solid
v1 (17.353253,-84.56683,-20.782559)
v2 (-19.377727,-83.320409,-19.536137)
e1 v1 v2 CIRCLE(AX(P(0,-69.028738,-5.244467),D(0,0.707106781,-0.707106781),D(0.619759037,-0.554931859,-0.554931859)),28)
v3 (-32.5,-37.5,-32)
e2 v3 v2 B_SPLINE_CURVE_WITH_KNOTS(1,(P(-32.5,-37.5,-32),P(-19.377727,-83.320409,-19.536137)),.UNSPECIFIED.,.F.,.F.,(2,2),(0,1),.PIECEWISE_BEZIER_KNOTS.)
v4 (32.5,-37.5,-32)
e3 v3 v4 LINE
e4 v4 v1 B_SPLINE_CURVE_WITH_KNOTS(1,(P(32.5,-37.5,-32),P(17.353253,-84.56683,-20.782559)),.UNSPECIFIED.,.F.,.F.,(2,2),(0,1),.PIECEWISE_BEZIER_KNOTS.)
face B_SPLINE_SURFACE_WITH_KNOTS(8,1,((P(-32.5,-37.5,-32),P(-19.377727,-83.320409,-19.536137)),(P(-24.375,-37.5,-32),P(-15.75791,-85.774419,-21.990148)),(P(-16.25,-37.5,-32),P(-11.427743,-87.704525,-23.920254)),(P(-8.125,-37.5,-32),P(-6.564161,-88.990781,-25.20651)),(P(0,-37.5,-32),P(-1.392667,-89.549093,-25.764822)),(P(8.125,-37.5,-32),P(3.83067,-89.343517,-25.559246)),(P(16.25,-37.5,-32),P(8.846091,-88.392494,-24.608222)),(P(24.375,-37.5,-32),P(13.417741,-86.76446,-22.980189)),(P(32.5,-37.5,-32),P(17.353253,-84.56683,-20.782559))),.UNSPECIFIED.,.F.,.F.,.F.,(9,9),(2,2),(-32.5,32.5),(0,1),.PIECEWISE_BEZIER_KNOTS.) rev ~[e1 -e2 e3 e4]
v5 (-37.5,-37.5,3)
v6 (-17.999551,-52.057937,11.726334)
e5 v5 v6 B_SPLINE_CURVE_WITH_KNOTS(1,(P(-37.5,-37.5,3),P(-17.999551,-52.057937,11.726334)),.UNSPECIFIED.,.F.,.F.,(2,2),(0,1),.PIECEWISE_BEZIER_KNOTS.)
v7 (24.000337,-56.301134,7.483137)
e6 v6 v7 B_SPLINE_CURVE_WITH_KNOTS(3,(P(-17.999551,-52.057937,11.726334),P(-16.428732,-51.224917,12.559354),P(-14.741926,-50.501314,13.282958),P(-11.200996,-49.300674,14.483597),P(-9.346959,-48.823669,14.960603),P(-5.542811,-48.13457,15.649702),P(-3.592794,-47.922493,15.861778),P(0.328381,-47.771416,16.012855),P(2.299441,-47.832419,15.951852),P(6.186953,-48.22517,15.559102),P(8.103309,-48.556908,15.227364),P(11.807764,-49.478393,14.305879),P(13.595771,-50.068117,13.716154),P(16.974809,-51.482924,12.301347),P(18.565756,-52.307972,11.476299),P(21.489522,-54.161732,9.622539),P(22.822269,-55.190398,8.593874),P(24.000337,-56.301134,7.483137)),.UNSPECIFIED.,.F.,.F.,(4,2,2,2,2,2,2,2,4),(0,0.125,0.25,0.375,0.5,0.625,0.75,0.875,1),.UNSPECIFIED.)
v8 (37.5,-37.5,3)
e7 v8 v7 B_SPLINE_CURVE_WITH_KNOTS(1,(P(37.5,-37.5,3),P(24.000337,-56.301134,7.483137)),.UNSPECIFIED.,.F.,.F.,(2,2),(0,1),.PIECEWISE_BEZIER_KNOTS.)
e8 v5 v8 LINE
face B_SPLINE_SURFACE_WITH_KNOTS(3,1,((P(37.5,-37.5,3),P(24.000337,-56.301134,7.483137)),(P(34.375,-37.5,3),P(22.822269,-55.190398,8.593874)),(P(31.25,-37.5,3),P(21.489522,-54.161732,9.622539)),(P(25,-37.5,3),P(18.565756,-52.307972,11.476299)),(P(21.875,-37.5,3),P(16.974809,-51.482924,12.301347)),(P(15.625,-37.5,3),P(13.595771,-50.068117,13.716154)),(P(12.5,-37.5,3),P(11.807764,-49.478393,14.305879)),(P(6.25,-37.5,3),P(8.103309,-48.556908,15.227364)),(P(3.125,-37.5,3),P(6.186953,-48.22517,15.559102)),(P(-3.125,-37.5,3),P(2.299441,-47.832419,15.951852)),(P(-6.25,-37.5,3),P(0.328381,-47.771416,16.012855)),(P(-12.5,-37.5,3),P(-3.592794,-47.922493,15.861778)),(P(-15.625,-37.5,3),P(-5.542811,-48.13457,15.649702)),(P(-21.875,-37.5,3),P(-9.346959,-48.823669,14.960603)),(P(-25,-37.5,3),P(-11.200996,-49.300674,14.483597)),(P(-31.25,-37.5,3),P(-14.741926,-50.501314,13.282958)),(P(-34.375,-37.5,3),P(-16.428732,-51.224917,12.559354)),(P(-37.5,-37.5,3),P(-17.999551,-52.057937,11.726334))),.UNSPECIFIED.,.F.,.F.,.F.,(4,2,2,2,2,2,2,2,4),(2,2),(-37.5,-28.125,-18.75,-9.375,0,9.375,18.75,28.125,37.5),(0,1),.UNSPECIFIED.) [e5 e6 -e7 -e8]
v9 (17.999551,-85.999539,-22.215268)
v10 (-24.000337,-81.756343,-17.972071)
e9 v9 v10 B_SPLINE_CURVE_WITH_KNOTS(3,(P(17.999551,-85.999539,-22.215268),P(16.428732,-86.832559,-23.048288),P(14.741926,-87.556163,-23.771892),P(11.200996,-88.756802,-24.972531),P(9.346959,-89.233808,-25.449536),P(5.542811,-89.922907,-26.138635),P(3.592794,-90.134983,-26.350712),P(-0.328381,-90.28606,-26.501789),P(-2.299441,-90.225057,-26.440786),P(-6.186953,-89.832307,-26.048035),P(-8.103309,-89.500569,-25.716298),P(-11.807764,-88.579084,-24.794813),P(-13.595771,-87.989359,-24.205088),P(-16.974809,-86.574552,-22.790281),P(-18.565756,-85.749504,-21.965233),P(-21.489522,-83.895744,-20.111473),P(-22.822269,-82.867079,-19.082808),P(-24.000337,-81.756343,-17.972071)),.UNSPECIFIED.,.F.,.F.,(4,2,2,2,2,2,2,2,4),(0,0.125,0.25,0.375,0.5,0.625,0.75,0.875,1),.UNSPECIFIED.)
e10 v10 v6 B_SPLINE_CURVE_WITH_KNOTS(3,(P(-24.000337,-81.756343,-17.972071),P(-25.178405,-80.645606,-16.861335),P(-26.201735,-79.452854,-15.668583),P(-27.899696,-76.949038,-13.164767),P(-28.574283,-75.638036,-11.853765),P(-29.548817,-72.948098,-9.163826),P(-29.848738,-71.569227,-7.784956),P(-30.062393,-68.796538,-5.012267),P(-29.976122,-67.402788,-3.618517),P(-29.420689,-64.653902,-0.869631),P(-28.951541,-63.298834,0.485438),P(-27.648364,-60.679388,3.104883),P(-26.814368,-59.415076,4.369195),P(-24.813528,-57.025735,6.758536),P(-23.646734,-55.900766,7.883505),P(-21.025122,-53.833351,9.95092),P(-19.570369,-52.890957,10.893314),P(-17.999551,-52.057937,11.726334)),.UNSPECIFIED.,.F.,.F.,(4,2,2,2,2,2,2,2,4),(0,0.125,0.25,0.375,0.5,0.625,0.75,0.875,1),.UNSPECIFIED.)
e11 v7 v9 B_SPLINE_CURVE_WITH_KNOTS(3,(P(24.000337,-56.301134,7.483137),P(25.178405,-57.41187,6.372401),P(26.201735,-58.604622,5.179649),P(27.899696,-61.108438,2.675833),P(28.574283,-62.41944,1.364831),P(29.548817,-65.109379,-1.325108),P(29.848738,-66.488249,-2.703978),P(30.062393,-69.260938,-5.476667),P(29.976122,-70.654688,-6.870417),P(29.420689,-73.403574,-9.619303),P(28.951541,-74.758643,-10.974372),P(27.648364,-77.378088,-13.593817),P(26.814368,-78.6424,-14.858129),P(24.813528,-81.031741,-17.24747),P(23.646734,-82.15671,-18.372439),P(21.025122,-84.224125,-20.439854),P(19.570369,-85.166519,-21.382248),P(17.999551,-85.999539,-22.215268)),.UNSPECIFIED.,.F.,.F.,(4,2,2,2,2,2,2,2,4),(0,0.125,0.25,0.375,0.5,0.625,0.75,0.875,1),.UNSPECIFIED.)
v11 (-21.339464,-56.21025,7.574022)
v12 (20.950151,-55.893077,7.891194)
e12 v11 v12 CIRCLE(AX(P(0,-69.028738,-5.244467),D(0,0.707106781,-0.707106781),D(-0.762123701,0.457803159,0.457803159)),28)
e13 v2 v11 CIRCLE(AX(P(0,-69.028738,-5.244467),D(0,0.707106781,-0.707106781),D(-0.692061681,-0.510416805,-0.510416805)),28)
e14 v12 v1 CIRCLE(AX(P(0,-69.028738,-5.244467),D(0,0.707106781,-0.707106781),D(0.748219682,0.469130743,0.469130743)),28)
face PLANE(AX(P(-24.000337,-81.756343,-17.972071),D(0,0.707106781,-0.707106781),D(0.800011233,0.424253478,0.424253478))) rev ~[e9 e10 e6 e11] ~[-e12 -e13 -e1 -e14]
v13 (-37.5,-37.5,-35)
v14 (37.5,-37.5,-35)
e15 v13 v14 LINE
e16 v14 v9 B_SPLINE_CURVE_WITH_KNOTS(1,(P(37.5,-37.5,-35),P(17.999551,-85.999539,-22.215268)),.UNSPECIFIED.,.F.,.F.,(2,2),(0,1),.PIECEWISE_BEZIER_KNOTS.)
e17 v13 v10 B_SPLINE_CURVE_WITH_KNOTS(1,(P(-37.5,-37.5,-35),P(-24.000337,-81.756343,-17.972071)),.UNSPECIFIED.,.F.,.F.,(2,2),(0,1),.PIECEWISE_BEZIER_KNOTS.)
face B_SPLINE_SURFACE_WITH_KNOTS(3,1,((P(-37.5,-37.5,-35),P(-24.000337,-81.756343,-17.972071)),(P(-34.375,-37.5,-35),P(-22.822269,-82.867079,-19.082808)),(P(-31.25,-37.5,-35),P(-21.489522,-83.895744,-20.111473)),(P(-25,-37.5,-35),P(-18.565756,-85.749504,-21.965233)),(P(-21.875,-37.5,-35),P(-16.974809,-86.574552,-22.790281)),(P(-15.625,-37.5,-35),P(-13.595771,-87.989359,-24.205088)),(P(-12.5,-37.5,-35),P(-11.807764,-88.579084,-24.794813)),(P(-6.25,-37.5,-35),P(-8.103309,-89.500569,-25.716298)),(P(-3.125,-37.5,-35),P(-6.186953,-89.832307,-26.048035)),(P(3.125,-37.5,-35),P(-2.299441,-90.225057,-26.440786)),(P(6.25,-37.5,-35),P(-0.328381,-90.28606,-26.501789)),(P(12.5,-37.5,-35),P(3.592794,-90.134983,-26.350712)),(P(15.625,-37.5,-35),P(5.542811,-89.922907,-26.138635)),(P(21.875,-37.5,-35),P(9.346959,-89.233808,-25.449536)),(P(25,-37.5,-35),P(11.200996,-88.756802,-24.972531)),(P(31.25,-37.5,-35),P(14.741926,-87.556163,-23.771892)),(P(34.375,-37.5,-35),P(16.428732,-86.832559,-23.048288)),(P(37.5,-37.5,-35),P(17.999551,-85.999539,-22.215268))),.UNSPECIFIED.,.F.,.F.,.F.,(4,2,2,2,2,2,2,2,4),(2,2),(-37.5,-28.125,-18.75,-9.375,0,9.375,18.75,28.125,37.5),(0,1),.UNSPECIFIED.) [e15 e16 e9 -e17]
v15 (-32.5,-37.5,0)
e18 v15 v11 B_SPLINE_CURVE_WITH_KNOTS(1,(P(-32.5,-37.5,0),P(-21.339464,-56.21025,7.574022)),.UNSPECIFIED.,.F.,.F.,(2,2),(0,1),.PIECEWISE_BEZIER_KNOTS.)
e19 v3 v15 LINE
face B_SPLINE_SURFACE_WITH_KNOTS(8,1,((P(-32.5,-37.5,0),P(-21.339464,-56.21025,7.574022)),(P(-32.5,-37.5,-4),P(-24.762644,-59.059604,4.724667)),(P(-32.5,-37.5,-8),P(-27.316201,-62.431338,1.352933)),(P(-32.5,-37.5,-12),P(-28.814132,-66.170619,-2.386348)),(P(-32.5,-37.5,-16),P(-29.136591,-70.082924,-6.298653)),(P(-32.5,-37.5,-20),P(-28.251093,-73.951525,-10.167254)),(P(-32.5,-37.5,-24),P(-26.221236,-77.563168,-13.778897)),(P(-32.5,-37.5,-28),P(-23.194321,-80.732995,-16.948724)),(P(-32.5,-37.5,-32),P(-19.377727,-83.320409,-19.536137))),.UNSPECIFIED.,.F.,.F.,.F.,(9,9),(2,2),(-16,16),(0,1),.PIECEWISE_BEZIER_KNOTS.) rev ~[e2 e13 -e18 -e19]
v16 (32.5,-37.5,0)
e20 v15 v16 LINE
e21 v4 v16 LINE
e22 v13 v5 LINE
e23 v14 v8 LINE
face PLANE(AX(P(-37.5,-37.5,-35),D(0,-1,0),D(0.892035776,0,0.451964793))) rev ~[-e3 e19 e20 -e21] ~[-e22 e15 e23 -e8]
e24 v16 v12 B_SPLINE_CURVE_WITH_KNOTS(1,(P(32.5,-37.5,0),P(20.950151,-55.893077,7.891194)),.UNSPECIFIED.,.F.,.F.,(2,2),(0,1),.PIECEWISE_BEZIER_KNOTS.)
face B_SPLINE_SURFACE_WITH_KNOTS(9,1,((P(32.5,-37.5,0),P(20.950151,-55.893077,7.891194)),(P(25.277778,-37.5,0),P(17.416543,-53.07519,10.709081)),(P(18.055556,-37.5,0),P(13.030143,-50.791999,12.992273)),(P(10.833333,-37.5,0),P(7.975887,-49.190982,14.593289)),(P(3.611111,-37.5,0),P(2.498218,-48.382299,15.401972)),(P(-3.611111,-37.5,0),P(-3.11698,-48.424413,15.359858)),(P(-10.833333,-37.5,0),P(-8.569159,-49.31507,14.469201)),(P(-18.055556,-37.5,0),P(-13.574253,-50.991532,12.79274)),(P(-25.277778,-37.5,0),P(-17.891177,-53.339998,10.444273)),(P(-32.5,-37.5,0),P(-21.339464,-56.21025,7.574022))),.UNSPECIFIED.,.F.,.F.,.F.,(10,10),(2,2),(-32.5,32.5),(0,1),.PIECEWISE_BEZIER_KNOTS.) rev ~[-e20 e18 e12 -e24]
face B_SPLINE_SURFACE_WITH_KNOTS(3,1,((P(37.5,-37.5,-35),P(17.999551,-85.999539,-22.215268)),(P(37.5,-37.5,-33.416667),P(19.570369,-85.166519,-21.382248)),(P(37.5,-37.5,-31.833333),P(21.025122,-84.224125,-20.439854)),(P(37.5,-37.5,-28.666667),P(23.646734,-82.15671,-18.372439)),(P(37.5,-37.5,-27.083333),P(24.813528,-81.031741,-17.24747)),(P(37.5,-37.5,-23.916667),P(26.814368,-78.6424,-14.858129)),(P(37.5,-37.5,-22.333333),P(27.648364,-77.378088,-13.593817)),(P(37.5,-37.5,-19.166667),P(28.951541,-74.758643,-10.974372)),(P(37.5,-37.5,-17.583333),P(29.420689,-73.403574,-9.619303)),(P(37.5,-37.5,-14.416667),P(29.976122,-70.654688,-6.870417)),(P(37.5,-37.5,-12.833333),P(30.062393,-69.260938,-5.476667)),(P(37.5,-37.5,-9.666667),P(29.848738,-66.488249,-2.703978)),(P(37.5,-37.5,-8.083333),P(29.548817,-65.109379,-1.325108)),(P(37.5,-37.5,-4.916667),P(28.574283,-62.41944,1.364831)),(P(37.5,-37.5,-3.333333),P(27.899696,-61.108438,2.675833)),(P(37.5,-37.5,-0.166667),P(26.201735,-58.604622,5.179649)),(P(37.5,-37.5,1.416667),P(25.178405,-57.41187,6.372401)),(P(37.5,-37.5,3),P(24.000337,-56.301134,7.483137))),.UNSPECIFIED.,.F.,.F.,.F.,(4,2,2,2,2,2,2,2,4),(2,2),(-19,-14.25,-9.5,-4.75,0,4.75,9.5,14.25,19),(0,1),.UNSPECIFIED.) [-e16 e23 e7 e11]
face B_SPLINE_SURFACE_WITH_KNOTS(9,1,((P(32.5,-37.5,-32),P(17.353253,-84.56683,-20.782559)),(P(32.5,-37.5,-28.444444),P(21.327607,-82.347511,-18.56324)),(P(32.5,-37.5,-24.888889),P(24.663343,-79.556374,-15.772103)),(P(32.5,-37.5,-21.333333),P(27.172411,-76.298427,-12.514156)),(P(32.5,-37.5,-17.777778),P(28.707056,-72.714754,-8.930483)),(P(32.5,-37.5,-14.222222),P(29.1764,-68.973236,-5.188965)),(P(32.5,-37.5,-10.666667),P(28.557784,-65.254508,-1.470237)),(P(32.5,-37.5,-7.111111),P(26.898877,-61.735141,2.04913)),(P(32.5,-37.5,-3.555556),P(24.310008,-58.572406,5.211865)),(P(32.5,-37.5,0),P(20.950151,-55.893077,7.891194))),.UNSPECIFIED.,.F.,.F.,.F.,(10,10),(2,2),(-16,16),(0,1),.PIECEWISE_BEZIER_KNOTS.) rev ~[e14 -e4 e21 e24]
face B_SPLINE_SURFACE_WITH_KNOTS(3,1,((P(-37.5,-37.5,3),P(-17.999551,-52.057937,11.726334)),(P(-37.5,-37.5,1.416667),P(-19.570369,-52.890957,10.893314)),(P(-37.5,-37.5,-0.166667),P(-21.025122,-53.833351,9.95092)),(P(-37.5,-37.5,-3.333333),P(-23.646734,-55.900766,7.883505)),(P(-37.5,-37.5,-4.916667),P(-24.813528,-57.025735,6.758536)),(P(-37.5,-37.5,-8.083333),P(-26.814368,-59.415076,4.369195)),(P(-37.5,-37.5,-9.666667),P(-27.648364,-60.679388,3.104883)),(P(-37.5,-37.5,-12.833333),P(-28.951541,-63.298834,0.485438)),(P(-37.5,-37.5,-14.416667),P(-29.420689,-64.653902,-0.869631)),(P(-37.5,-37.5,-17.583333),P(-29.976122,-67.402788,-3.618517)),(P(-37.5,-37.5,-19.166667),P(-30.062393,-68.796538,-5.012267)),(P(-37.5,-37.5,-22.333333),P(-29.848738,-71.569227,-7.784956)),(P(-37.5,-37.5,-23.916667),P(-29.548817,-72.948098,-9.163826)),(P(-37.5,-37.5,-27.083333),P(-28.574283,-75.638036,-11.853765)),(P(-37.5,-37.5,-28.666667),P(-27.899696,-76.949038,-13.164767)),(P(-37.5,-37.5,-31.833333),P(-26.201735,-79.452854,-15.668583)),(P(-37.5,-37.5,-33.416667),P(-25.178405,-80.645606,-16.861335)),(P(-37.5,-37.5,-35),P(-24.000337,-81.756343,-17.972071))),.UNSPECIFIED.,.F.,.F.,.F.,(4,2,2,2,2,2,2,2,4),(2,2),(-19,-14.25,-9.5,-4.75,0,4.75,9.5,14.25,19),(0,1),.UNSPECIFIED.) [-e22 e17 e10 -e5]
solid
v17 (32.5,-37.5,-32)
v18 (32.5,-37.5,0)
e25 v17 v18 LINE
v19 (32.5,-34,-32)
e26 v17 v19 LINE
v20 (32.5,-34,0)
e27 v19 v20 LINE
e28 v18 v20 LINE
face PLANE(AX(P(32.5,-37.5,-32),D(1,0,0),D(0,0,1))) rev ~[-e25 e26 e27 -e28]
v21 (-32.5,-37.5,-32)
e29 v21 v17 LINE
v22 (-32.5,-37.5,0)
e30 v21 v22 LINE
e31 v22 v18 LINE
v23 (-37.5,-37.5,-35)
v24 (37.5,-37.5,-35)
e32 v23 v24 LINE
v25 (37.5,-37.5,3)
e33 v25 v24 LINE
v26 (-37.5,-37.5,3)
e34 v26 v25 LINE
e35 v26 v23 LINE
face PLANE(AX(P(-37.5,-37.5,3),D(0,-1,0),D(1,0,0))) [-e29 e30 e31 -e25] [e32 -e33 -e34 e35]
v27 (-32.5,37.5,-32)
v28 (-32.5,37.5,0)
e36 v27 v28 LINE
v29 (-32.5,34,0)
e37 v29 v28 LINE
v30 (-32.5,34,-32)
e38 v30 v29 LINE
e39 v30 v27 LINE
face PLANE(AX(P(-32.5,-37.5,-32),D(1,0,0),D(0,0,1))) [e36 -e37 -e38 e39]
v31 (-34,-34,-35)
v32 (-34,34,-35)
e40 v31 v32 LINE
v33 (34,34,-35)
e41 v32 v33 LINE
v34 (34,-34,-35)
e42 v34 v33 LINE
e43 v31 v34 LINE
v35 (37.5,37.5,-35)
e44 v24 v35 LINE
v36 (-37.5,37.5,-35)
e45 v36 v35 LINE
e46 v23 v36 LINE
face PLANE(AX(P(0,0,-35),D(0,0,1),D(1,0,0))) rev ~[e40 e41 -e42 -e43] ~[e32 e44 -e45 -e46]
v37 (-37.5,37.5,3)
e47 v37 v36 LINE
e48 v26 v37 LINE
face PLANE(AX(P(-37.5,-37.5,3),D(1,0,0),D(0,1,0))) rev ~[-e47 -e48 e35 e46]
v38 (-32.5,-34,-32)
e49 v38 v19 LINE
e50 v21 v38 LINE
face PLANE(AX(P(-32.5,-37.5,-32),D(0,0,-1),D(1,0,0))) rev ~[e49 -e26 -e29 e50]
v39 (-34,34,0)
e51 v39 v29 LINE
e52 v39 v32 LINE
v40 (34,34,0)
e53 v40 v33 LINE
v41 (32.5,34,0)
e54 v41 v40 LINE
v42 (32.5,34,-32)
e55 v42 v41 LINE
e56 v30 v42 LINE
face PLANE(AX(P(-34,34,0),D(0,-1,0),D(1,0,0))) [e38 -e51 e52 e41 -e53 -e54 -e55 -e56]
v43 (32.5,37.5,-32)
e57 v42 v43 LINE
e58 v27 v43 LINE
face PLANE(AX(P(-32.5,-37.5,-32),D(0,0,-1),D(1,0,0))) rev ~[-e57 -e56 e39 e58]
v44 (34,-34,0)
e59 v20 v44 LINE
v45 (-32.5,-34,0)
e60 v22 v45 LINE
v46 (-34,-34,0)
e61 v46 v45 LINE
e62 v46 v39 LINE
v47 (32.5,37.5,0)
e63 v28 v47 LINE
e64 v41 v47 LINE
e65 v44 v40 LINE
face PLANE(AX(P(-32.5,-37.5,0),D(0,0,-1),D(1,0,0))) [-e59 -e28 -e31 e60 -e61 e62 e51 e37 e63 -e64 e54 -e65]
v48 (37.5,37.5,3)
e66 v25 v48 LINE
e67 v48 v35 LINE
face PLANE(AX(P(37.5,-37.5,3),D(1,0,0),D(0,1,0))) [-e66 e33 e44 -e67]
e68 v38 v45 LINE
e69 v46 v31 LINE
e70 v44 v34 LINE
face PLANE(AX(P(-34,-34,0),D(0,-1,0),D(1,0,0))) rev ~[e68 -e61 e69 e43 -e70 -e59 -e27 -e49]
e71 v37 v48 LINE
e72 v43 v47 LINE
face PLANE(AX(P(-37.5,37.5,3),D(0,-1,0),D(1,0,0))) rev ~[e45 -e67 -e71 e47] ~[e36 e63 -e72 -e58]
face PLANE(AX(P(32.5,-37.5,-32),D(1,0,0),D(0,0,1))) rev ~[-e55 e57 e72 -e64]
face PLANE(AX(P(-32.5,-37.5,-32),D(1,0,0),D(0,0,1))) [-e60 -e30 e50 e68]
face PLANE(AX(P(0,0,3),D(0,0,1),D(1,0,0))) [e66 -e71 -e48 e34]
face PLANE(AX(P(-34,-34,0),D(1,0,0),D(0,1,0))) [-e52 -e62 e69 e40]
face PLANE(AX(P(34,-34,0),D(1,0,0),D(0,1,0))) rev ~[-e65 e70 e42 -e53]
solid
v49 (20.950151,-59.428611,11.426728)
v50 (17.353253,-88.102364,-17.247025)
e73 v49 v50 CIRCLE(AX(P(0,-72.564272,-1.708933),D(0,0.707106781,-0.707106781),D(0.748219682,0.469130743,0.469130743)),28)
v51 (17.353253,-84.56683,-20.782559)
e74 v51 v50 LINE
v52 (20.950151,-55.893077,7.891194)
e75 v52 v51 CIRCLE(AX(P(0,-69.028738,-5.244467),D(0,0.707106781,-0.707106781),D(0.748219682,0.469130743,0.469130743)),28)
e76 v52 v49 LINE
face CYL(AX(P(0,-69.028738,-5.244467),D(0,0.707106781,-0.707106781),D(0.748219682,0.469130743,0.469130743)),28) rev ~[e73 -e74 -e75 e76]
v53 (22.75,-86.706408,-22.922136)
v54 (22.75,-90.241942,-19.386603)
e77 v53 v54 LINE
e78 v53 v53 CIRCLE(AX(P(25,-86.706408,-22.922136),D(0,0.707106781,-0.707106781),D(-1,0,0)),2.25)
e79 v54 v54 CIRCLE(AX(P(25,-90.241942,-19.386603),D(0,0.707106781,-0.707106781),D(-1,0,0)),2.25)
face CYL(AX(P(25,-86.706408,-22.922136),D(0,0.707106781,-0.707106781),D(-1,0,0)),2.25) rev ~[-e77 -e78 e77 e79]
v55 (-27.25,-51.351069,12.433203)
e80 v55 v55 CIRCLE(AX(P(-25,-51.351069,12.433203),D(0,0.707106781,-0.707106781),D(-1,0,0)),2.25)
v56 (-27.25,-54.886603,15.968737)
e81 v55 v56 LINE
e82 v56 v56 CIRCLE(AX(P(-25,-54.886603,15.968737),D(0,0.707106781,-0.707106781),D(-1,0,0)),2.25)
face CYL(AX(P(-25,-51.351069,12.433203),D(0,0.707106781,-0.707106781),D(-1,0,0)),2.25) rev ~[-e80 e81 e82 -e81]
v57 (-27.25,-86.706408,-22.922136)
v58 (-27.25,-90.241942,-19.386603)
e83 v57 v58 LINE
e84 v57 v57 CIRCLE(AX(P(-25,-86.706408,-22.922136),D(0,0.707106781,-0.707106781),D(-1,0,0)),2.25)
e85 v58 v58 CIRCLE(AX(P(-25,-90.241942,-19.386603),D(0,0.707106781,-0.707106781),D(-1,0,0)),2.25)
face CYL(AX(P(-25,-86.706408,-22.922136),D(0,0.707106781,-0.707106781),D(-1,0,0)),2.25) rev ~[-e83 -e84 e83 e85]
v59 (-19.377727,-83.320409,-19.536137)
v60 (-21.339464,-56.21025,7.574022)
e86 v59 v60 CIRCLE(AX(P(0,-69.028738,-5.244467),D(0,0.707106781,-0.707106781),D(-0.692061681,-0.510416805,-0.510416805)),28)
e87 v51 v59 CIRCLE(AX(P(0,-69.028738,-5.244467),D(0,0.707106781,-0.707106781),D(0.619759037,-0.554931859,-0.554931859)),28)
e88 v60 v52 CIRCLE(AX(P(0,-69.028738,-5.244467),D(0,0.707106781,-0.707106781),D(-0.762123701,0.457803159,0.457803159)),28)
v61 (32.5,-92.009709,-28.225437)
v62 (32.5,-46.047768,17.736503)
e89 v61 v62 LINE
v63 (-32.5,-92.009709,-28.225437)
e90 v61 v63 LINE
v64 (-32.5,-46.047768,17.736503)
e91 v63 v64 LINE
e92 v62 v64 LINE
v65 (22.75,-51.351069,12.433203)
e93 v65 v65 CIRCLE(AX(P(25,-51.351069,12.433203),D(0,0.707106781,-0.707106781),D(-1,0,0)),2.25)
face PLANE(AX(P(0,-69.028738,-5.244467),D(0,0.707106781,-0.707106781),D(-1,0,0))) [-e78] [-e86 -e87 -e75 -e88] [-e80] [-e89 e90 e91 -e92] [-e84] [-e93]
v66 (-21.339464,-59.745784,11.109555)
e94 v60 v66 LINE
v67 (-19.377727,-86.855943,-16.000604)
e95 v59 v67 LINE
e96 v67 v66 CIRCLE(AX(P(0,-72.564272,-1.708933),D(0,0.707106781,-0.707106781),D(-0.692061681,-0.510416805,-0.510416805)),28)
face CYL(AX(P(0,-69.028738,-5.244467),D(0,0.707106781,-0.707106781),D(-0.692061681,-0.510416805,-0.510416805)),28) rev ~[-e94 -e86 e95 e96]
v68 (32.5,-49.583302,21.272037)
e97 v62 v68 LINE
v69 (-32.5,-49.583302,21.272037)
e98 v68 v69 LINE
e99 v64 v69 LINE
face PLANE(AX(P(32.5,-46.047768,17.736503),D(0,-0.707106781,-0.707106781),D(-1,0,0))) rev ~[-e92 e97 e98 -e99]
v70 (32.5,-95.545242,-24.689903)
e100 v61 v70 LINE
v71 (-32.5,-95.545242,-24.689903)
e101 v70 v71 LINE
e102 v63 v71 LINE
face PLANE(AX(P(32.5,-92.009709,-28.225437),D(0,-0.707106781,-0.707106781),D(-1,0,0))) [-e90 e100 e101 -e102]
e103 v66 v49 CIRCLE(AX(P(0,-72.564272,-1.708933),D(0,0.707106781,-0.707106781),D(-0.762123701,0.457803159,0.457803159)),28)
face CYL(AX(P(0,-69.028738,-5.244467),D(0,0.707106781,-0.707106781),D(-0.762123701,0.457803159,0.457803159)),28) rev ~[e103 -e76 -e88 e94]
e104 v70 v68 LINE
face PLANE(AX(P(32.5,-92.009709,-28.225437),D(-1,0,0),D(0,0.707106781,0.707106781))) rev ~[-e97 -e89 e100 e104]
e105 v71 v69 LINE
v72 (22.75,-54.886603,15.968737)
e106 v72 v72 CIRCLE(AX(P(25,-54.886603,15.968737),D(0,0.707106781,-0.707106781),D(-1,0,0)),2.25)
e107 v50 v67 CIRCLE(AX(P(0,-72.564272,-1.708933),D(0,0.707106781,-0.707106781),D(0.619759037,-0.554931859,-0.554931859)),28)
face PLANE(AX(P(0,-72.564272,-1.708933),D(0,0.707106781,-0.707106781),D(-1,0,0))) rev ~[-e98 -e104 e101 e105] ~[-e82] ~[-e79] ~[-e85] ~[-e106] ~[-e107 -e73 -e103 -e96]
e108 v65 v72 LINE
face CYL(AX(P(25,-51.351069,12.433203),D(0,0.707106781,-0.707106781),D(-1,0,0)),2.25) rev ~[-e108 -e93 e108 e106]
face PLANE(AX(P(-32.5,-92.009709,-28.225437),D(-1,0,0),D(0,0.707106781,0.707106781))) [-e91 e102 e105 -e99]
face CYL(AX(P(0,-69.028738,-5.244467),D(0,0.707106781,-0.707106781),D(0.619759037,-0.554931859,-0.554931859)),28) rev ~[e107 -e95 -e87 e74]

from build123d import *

# Parameters (mm, degrees)
F1_W      = 75
F1_H      = 75
F2_DEPTH  = 38
F3_W      = 68
F3_H      = 68
F4_DEPTH  = 35
F6_W      = 65
F6_H      = 32
F7_DEPTH  = 75
F9_W      = 65
F9_H      = 32
F10_W     = 75
F10_H     = 38
F18_DEPTH = 5
F21_R     = 2.25
F22_DEPTH = 5
F19_W     = 65
F19_H     = 65
F23_DEPTH = 5


# Not quite as in the source:
# - a feature of the source that left no trace in its solid (it failed there, or was rolled back) is left out
# - the arcs of a loft's sections are written as splines that run evenly, so that the points pair up as in the source's solid


with BuildPart() as f2:
    # F1 (on offset) → F2 (new body)
    with BuildSketch(Plane.XY.offset(3)):
        Rectangle(F1_W, F1_H)
    extrude(amount=-F2_DEPTH)


with BuildPart() as f4:
    # F3 (on Top) → F4 (new body, through all)
    with BuildSketch(Plane.XY):
        Rectangle(F3_W, F3_H)
    extrude(amount=-F4_DEPTH)


with BuildPart() as f2_1:
    add(f2.part)

    # F5: cut F4
    add(f4.part, mode=Mode.SUBTRACT)


with BuildPart() as f7:
    # F6 (on face) → F7 (new body, through all)
    with BuildSketch(Plane.XZ.offset(37.5)):
        with Locations((0, -16)):
            Rectangle(F6_W, F6_H)
    extrude(amount=-F7_DEPTH)


with BuildPart() as f2_2:
    add(f2_1.part)

    # F8: cut F7
    add(f7.part, mode=Mode.SUBTRACT)


with BuildPart() as f15:
    # F9 (on face) → F15 section 0
    with BuildSketch(Plane.XZ.offset(37.5)):
        with Locations((0, -16)):
            Rectangle(F9_W, F9_H)
    # F14 (on offset) → F15 section 1
    with BuildSketch(Plane(origin=(0, -31.8921356237, 31.8921356237), x_dir=(-1, 0, 0), z_dir=(0, 0.7071067812, -0.7071067812))):
        with BuildLine():
            ThreePointArc((19.3777270669, -72.7305613051), (27.9634183298, -53.9499033063), (21.3394636211, -34.3910067794))
            ThreePointArc((21.3394636211, -34.3910067794), (0.2969683656, -24.5206618662), (-20.9501510919, -33.9424573448))
            ThreePointArc((-20.9501510919, -33.9424573448), (-27.8904955693, -54.9930022936), (-17.3532530257, -74.4932675145))
            ThreePointArc((-17.3532530257, -74.4932675145), (1.3421650722, -80.4869005137), (19.3777270669, -72.7305613051))
        make_face()
    loft()


with BuildPart() as f17:
    # F10 (on face) → F17 section 0
    with BuildSketch(Plane.XZ.offset(37.5)):
        with Locations((0, -16)):
            Rectangle(F10_W, F10_H)
    # F16 (on offset) → F17 section 1
    with BuildSketch(Plane(origin=(0, -31.8921356237, 31.8921356237), x_dir=(-1, 0, 0), z_dir=(0, 0.7071067812, -0.7071067812))):
        with BuildLine():
            add(Edge.make_bspline(
                [(-24.0003369849, -34.5195363186), (-25.1784048219, -36.090354701), (-26.2017352476, -37.7771609273), (-27.8996955072, -41.31809129), (-28.5742833559, -43.1721278699), (-29.5488165406, -46.9762758623), (-29.8487377794, -48.9262932099), (-30.0623931254, -52.8474675582), (-29.9761219495, -54.8185276002), (-29.4206888016, -58.7060397732), (-28.9515405638, -60.6223957777), (-27.6483639065, -64.3268508627), (-26.8143677105, -66.1148583431), (-24.8135278918, -69.4938962086), (-23.6467337438, -71.0848430403), (-21.0251219159, -74.0086091562), (-19.5703690605, -75.3413561445), (-17.9995506781, -76.5194239816)],
                knots=[0, 0, 0, 0, 0.125, 0.125, 0.25, 0.25, 0.375, 0.375, 0.5, 0.5, 0.625, 0.625, 0.75, 0.75, 0.875, 0.875, 1, 1, 1, 1], degree=3))
            add(Edge.make_bspline(
                [(-17.9995506781, -76.5194239816), (-16.4287322957, -77.6974918186), (-14.7419260694, -78.7208222443), (-11.2009957067, -80.418782504), (-9.3469591268, -81.0933703526), (-5.5428111344, -82.0679035373), (-3.5927937869, -82.3678247761), (0.3283805615, -82.5814801221), (2.2994406035, -82.4952089462), (6.1869527765, -81.9397757983), (8.103308781, -81.4706275605), (11.8077638659, -80.1674509032), (13.5957713464, -79.3334547072), (16.9748092119, -77.3326148885), (18.5657560436, -76.1658207405), (21.4895221595, -73.5442089126), (22.8222691478, -72.0894560572), (24.0003369849, -70.5186376748)],
                knots=[0, 0, 0, 0, 0.125, 0.125, 0.25, 0.25, 0.375, 0.375, 0.5, 0.5, 0.625, 0.625, 0.75, 0.75, 0.875, 0.875, 1, 1, 1, 1], degree=3))
            add(Edge.make_bspline(
                [(24.0003369849, -70.5186376748), (25.1784048219, -68.9478192924), (26.2017352476, -67.2610130661), (27.8996955072, -63.7200827034), (28.5742833559, -61.8660461235), (29.5488165406, -58.0618981311), (29.8487377794, -56.1118807836), (30.0623931254, -52.1907064353), (29.9761219495, -50.2196463932), (29.4206888016, -46.3321342203), (28.9515405638, -44.4157782157), (27.6483639065, -40.7113231308), (26.8143677105, -38.9233156503), (24.8135278918, -35.5442777848), (23.6467337438, -33.9533309531), (21.0251219159, -31.0295648372), (19.5703690605, -29.6968178489), (17.9995506781, -28.5187500119)],
                knots=[0, 0, 0, 0, 0.125, 0.125, 0.25, 0.25, 0.375, 0.375, 0.5, 0.5, 0.625, 0.625, 0.75, 0.75, 0.875, 0.875, 1, 1, 1, 1], degree=3))
            add(Edge.make_bspline(
                [(17.9995506781, -28.5187500119), (16.4287322957, -27.3406821748), (14.7419260694, -26.3173517491), (11.2009957067, -24.6193914895), (9.3469591268, -23.9448036409), (5.5428111344, -22.9702704561), (3.5927937869, -22.6703492173), (-0.3283805615, -22.4566938713), (-2.2994406035, -22.5429650472), (-6.1869527765, -23.0983981951), (-8.103308781, -23.5675464329), (-11.8077638659, -24.8707230902), (-13.5957713464, -25.7047192862), (-16.9748092119, -27.7055591049), (-18.5657560436, -28.8723532529), (-21.4895221595, -31.4939650809), (-22.8222691478, -32.9487179362), (-24.0003369849, -34.5195363186)],
                knots=[0, 0, 0, 0, 0.125, 0.125, 0.25, 0.25, 0.375, 0.375, 0.5, 0.5, 0.625, 0.625, 0.75, 0.75, 0.875, 0.875, 1, 1, 1, 1], degree=3))
        make_face()
    loft(ruled=True)

    # F25: cut F15
    add(f15.part, mode=Mode.SUBTRACT)


with BuildPart() as f18:
    # F14 (on offset) → F18 (new body)
    with BuildSketch(Plane(origin=(0, -31.8921356237, 31.8921356237), x_dir=(-1, 0, 0), z_dir=(0, 0.7071067812, -0.7071067812))):
        with BuildLine():
            ThreePointArc((19.3777270669, -72.7305613051), (27.9634183298, -53.9499033063), (21.3394636211, -34.3910067794))
            ThreePointArc((21.3394636211, -34.3910067794), (0.2969683656, -24.5206618662), (-20.9501510919, -33.9424573448))
            ThreePointArc((-20.9501510919, -33.9424573448), (-27.8904955693, -54.9930022936), (-17.3532530257, -74.4932675145))
            ThreePointArc((-17.3532530257, -74.4932675145), (1.3421650722, -80.4869005137), (19.3777270669, -72.7305613051))
        make_face()
    extrude(amount=-F18_DEPTH)


with BuildPart() as f22:
    # F21 (on face) → F22 (new body)
    with BuildSketch(Plane(origin=(0, -31.8921356237, 31.8921356237), x_dir=(-1, 0, 0), z_dir=(0, 0.7071067812, -0.7071067812))):
        with Locations((-25, -27.5190869967)):
            Circle(F21_R)
    extrude(amount=-F22_DEPTH)


with BuildPart() as f22b:
    # F21 (on face) → F22, piece 2 (new body)
    with BuildSketch(Plane(origin=(0, -31.8921356237, 31.8921356237), x_dir=(-1, 0, 0), z_dir=(0, 0.7071067812, -0.7071067812))):
        with Locations((25, -27.5190869967)):
            Circle(F21_R)
    extrude(amount=-F22_DEPTH)


with BuildPart() as f22c:
    # F21 (on face) → F22, piece 3 (new body)
    with BuildSketch(Plane(origin=(0, -31.8921356237, 31.8921356237), x_dir=(-1, 0, 0), z_dir=(0, 0.7071067812, -0.7071067812))):
        with Locations((25, -77.5190869967)):
            Circle(F21_R)
    extrude(amount=-F22_DEPTH)


with BuildPart() as f22d:
    # F21 (on face) → F22, piece 4 (new body)
    with BuildSketch(Plane(origin=(0, -31.8921356237, 31.8921356237), x_dir=(-1, 0, 0), z_dir=(0, 0.7071067812, -0.7071067812))):
        with Locations((-25, -77.5190869967)):
            Circle(F21_R)
    extrude(amount=-F22_DEPTH)


with BuildPart() as f23:
    # F19 (on offset) → F23 (new body)
    with BuildSketch(Plane(origin=(0, -31.8921356237, 31.8921356237), x_dir=(-1, 0, 0), z_dir=(0, 0.7071067812, -0.7071067812))):
        with Locations((0, -52.5190869967)):
            Rectangle(F19_W, F19_H)
    extrude(amount=-F23_DEPTH)

    # F24: cut F22, F22b, F22c, F22d, F18
    add(f22.part, mode=Mode.SUBTRACT)
    add(f22b.part, mode=Mode.SUBTRACT)
    add(f22c.part, mode=Mode.SUBTRACT)
    add(f22d.part, mode=Mode.SUBTRACT)
    add(f18.part, mode=Mode.SUBTRACT)


solid = Compound([f2_2.part, f17.part, f23.part])
